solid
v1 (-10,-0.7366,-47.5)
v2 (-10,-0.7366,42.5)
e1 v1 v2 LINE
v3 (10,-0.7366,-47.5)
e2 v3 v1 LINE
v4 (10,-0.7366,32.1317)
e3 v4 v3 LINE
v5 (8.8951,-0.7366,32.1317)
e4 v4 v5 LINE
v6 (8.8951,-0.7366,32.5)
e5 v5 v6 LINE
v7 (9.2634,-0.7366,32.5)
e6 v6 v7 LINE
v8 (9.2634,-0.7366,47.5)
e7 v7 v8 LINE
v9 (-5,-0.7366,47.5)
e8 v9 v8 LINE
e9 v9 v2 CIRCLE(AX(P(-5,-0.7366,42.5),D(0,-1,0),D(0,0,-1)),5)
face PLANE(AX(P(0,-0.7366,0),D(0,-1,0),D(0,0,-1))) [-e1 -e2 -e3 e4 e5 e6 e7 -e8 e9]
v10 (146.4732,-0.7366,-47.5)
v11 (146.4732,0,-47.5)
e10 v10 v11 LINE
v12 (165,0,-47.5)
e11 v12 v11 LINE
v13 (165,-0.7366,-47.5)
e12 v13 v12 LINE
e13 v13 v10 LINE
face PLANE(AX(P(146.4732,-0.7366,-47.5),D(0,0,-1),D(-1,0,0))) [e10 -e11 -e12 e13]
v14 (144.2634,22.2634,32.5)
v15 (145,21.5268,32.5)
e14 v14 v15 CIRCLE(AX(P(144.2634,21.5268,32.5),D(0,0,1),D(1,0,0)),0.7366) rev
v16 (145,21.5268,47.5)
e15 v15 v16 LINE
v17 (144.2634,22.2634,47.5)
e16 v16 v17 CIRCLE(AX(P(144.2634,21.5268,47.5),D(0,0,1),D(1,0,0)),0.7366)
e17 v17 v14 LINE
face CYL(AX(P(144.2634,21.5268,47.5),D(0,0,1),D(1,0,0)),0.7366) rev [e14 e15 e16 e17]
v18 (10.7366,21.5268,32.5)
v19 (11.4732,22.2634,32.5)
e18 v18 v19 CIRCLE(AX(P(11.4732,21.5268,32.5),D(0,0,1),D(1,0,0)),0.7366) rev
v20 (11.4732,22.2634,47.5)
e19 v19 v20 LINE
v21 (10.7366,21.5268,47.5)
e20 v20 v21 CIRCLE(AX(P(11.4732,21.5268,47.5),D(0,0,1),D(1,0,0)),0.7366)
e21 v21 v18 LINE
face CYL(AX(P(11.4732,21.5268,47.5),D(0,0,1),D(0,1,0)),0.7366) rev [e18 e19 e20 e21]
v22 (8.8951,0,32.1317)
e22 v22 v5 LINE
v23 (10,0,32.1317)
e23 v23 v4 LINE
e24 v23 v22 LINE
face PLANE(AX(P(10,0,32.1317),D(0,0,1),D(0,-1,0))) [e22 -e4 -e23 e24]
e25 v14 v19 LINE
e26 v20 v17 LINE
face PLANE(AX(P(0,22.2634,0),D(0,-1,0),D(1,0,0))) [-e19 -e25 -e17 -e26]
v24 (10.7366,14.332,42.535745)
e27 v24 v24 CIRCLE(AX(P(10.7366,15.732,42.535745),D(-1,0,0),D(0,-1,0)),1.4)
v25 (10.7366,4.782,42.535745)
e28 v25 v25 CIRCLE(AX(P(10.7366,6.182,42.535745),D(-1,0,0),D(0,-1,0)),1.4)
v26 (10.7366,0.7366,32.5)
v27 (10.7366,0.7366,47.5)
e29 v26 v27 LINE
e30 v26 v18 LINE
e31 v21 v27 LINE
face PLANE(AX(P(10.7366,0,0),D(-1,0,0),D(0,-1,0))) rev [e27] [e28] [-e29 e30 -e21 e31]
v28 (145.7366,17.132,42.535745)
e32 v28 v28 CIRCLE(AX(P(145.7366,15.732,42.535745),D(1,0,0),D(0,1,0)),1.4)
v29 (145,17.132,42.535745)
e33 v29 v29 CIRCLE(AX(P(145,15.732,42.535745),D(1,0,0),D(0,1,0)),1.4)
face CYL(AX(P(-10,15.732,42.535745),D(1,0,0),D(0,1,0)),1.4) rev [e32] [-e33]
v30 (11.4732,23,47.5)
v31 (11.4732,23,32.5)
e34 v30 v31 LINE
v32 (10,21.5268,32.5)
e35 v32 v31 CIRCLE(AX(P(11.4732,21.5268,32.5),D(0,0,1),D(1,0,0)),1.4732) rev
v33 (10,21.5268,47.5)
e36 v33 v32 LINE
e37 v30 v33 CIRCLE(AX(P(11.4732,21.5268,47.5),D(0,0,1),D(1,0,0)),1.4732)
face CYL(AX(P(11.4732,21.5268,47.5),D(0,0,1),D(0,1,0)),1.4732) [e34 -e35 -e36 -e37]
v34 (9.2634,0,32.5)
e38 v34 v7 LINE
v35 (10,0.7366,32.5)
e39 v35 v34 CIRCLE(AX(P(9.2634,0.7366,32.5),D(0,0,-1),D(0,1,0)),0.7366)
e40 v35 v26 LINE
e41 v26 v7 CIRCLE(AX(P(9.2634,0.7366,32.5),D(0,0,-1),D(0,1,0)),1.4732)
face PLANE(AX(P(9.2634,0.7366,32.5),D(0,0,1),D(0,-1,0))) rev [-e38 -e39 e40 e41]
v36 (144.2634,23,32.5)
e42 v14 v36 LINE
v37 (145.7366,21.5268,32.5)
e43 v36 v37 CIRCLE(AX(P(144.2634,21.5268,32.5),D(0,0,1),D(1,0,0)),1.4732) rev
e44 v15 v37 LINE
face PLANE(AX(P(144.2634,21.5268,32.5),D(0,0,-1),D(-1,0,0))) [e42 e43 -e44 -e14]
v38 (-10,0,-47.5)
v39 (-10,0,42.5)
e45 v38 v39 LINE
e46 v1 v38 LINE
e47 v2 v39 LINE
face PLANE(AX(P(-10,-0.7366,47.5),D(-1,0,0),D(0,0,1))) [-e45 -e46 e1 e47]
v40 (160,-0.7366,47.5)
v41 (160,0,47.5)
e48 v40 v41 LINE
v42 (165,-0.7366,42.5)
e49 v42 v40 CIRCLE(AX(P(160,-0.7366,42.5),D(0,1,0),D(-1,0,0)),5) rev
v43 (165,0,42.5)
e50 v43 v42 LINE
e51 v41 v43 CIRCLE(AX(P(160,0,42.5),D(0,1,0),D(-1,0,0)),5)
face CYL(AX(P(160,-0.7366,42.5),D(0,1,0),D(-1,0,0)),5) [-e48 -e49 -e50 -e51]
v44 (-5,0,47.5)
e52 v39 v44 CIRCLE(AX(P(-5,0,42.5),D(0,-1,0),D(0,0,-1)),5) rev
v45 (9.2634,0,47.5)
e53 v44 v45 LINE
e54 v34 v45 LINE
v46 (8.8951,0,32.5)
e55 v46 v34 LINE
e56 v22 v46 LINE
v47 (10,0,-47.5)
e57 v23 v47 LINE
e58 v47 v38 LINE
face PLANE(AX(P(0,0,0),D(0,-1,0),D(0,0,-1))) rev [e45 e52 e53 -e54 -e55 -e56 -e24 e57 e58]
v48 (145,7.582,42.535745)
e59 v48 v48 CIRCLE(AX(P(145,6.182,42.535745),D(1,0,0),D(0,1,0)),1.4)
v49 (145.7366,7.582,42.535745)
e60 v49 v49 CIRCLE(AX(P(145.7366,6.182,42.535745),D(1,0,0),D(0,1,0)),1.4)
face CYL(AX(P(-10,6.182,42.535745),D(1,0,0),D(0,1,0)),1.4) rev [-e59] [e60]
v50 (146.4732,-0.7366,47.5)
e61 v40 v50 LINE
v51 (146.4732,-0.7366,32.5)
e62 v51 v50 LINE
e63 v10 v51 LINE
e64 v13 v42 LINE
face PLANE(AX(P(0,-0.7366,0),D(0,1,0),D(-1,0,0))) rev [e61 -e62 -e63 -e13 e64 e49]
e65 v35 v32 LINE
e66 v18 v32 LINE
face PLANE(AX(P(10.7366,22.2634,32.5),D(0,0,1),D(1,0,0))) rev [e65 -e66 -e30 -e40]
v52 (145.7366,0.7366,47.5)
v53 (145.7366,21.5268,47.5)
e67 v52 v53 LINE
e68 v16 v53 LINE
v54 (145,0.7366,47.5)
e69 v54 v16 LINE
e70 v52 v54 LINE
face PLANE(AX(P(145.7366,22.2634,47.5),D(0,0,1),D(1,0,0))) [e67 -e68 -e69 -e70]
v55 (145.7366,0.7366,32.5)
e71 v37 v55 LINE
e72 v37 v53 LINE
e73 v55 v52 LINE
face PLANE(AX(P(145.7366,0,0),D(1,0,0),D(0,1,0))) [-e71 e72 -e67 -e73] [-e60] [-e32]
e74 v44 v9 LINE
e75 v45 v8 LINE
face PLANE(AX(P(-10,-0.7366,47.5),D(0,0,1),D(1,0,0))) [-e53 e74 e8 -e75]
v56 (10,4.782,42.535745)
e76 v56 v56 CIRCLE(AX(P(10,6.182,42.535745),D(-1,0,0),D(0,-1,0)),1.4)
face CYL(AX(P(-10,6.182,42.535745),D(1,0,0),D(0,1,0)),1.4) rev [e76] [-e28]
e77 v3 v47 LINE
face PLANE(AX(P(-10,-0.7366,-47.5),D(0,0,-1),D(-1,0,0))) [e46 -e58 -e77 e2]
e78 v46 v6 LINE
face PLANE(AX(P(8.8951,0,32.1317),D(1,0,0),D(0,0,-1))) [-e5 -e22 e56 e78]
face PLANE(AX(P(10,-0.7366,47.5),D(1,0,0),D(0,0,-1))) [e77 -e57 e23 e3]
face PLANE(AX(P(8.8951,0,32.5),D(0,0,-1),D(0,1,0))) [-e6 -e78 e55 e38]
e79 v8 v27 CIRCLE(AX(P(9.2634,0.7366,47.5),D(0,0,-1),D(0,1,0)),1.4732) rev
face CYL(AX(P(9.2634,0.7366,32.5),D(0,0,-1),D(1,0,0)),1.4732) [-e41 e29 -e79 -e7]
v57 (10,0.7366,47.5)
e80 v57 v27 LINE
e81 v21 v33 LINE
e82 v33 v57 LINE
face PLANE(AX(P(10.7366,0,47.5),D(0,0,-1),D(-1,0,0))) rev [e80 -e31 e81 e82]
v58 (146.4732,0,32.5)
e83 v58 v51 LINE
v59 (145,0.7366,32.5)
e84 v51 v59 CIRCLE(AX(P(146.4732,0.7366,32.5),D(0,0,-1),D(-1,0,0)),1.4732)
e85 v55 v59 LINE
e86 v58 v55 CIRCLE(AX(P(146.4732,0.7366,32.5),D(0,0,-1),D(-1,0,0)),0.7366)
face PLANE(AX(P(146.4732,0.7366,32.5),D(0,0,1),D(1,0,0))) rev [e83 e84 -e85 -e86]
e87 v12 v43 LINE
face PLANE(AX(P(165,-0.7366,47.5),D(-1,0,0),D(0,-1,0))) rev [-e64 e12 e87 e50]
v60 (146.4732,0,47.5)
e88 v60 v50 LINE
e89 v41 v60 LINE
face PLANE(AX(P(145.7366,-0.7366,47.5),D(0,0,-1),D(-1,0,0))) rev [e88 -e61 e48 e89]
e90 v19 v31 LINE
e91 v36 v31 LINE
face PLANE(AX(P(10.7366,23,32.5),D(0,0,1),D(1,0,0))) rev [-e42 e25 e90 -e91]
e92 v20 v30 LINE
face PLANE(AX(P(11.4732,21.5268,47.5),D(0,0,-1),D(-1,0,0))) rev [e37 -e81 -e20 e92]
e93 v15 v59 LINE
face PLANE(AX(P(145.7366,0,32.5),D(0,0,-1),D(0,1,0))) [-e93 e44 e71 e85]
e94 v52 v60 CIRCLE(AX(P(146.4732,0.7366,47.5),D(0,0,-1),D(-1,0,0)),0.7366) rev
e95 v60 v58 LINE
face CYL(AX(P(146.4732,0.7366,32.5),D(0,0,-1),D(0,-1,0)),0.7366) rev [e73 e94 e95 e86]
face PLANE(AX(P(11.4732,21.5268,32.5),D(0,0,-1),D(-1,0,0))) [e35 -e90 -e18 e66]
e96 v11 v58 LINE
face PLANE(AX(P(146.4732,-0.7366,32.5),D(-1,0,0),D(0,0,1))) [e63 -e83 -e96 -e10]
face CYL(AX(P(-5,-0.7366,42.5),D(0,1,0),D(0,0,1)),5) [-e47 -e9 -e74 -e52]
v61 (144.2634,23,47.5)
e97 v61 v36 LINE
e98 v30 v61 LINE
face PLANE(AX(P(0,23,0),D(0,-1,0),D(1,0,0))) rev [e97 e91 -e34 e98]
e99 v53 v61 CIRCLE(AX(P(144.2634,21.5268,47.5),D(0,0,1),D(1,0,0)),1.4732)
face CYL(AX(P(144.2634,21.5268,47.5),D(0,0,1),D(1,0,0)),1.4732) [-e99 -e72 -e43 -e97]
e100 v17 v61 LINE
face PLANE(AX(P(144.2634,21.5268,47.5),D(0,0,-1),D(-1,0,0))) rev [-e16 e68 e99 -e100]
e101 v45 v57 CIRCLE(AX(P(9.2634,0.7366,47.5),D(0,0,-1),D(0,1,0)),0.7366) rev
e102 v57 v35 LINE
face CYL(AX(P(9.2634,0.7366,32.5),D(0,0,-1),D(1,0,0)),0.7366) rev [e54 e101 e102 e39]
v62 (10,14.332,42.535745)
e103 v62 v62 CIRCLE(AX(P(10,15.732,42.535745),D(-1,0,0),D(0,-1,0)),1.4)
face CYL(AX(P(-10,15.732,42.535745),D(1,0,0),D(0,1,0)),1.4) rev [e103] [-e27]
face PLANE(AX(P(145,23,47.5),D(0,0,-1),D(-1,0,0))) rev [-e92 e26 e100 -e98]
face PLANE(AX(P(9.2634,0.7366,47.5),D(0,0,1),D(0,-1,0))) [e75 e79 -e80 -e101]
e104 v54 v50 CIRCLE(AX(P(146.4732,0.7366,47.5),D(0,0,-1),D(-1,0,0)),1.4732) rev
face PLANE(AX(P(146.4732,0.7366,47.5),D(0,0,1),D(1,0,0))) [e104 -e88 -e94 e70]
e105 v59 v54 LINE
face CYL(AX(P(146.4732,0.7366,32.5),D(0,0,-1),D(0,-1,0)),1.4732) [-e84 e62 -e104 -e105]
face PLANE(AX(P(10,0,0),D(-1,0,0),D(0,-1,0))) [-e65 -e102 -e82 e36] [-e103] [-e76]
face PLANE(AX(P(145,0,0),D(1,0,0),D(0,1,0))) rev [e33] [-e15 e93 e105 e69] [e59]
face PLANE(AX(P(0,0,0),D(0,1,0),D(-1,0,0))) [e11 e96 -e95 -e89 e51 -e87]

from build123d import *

# Parameters (mm, degrees)
SKETCH1_W                     = 20
SKETCH1_H                     = 95
BASE_FLANGE1_DEPTH            = 0.7366
EDGE_FLANGE1_STRIP_W          = 4.4196
EDGE_FLANGE1_STRIP_H          = 0.7366
EDGE_FLANGE1_STRIP_CUT_DEPTH  = 15
EDGE_FLANGE1_RELIEF_W         = 4.7879
EDGE_FLANGE1_RELIEF_H         = 0.3683
EDGE_FLANGE1_RELIEF_CUT_DEPTH = 0.7366
EDGE_FLANGE1_DEPTH            = 15
EDGE_FLANGE2_STRIP_W          = 4.4196
EDGE_FLANGE2_STRIP_H          = 0.7366
EDGE_FLANGE2_STRIP_CUT_DEPTH  = 15
EDGE_FLANGE2_DEPTH            = 15
EDGE_FLANGE3_STRIP_W          = 4.4196
EDGE_FLANGE3_STRIP_H          = 0.7366
EDGE_FLANGE3_STRIP_CUT_DEPTH  = 15
EDGE_FLANGE3_DEPTH            = 15
EDGE_FLANGE4_STRIP_W          = 4.4196
EDGE_FLANGE4_STRIP_H          = 0.7366
EDGE_FLANGE4_STRIP_CUT_DEPTH  = 15
EDGE_FLANGE4_DEPTH            = 15
SKETCH20_W                    = 18.5268
SKETCH20_H                    = 80
TAB1_DEPTH                    = 0.7366
CUT_EXTRUDE1_DEPTH            = 267.594423465
CUT_EXTRUDE1_DEPTH_BACK       = 267.594423465
SKETCH23_R                    = 1.4
CUT_EXTRUDE2_DEPTH            = 267.594423465
CUT_EXTRUDE2_DEPTH_BACK       = 267.594423465
SKETCH24_R                    = 1.4
FILLET3_R                     = 5
FILLET4_R                     = 5


# Sheet-metal steps are written as plain solids
with BuildPart() as part:
    # Sketch1 → Base-Flange1 (new body)
    with BuildSketch(Plane(origin=(0, 0, 0), x_dir=(1, 0, 0), z_dir=(0, 1, 0))):
        Rectangle(SKETCH1_W, SKETCH1_H)
    extrude(amount=-BASE_FLANGE1_DEPTH)

    # Edge-Flange1 strip (across the edge) → Edge-Flange1 strip cut (cut)
    with BuildSketch(Plane(origin=(10, 0, 47.5), x_dir=(-1, 0, 0), z_dir=(0, 0, -1))):
        with Locations((-1.4732, -0.3683)):
            Rectangle(EDGE_FLANGE1_STRIP_W, EDGE_FLANGE1_STRIP_H)
    extrude(amount=EDGE_FLANGE1_STRIP_CUT_DEPTH, mode=Mode.SUBTRACT)

    # Edge-Flange1 relief (on the sheet) → Edge-Flange1 relief cut (cut)
    with BuildSketch(Plane(origin=(9.2634, 0, 47.5), x_dir=(-1, 0, 0), z_dir=(0, 1, 0))):
        with Locations((-2.02565, -15.18415)):
            Rectangle(EDGE_FLANGE1_RELIEF_W, EDGE_FLANGE1_RELIEF_H)
    extrude(amount=-EDGE_FLANGE1_RELIEF_CUT_DEPTH, mode=Mode.SUBTRACT)

    # Edge-Flange1 section (across the edge) → Edge-Flange1 (add)
    with BuildSketch(Plane(origin=(10, 0, 47.5), x_dir=(-1, 0, 0), z_dir=(0, 0, -1))):
        with BuildLine():
            Line((-0.7366, 0.7366), (-0.7366, 22.2634))
            Line((-0.7366, 22.2634), (0, 22.2634))
            Line((0, 22.2634), (0, 0.7366))
            ThreePointArc((0, 0.7366), (0.215745145, 0.215745145), (0.7366, 0))
            Line((0.7366, 0), (0.7366, -0.7366))
            ThreePointArc((0.7366, -0.7366), (-0.30510971, -0.30510971), (-0.7366, 0.7366))
        make_face()
    extrude(amount=EDGE_FLANGE1_DEPTH)

    # Edge-Flange2 strip (across the edge) → Edge-Flange2 strip cut (cut)
    with BuildSketch(Plane(origin=(10.7366, 22.2634, 32.5), x_dir=(0, -1, 0), z_dir=(0, 0, 1))):
        with Locations((-1.4732, -0.3683)):
            Rectangle(EDGE_FLANGE2_STRIP_W, EDGE_FLANGE2_STRIP_H)
    extrude(amount=EDGE_FLANGE2_STRIP_CUT_DEPTH, mode=Mode.SUBTRACT)

    # Edge-Flange2 section (across the edge) → Edge-Flange2 (add)
    with BuildSketch(Plane(origin=(10.7366, 22.2634, 32.5), x_dir=(0, -1, 0), z_dir=(0, 0, 1))):
        with BuildLine():
            Line((-0.7366, 0.7366), (-0.7366, 134.2634))
            Line((-0.7366, 134.2634), (0, 134.2634))
            Line((0, 134.2634), (0, 0.7366))
            ThreePointArc((0, 0.7366), (0.215745145, 0.215745145), (0.7366, 0))
            Line((0.7366, 0), (0.7366, -0.7366))
            ThreePointArc((0.7366, -0.7366), (-0.30510971, -0.30510971), (-0.7366, 0.7366))
        make_face()
    extrude(amount=EDGE_FLANGE2_DEPTH)

    # Edge-Flange3 strip (across the edge) → Edge-Flange3 strip cut (cut)
    with BuildSketch(Plane(origin=(145, 22.2634, 32.5), x_dir=(-1, 0, 0), z_dir=(0, 0, 1))):
        with Locations((-1.4732, -0.3683)):
            Rectangle(EDGE_FLANGE3_STRIP_W, EDGE_FLANGE3_STRIP_H)
    extrude(amount=EDGE_FLANGE3_STRIP_CUT_DEPTH, mode=Mode.SUBTRACT)

    # Edge-Flange3 section (across the edge) → Edge-Flange3 (add)
    with BuildSketch(Plane(origin=(145, 22.2634, 32.5), x_dir=(-1, 0, 0), z_dir=(0, 0, 1))):
        with BuildLine():
            Line((-0.7366, 0.7366), (-0.7366, 22.2634))
            Line((-0.7366, 22.2634), (0, 22.2634))
            Line((0, 22.2634), (0, 0.7366))
            ThreePointArc((0, 0.7366), (0.215745145, 0.215745145), (0.7366, 0))
            Line((0.7366, 0), (0.7366, -0.7366))
            ThreePointArc((0.7366, -0.7366), (-0.30510971, -0.30510971), (-0.7366, 0.7366))
        make_face()
    extrude(amount=EDGE_FLANGE3_DEPTH)

    # Edge-Flange4 strip (across the edge) → Edge-Flange4 strip cut (cut)
    with BuildSketch(Plane(origin=(145.7366, 0, 47.5), x_dir=(0, 1, 0), z_dir=(0, 0, -1))):
        with Locations((-1.4732, -0.3683)):
            Rectangle(EDGE_FLANGE4_STRIP_W, EDGE_FLANGE4_STRIP_H)
    extrude(amount=EDGE_FLANGE4_STRIP_CUT_DEPTH, mode=Mode.SUBTRACT)

    # Edge-Flange4 section (across the edge) → Edge-Flange4 (add)
    with BuildSketch(Plane(origin=(145.7366, 0, 47.5), x_dir=(0, 1, 0), z_dir=(0, 0, -1))):
        with BuildLine():
            Line((-0.7366, 0.7366), (-0.7366, 19.2634))
            Line((-0.7366, 19.2634), (0, 19.2634))
            Line((0, 19.2634), (0, 0.7366))
            ThreePointArc((0, 0.7366), (0.215745145, 0.215745145), (0.7366, 0))
            Line((0.7366, 0), (0.7366, -0.7366))
            ThreePointArc((0.7366, -0.7366), (-0.30510971, -0.30510971), (-0.7366, 0.7366))
        make_face()
    extrude(amount=EDGE_FLANGE4_DEPTH)

    # Sketch20 → Tab1 (add)
    with BuildSketch(Plane(origin=(0, 0, 0), x_dir=(1, 0, 0), z_dir=(0, 1, 0))):
        with Locations((155.7366, 7.5)):
            Rectangle(SKETCH20_W, SKETCH20_H)
    extrude(amount=-TAB1_DEPTH)

    # Sketch23 → Cut-Extrude1 (cut, two sides: drawn at the far end of the back side and taken through both)
    with BuildSketch(Plane(origin=(10.7366, -49.681752082, -157.421333583), x_dir=(0, 0, -1), z_dir=(1, 0, 0)).offset(-CUT_EXTRUDE1_DEPTH_BACK)):
        with Locations(Location((-199.95707875, 65.413752097, 0), (0, 0, 270))):
            Circle(SKETCH23_R)
    extrude(amount=CUT_EXTRUDE1_DEPTH + CUT_EXTRUDE1_DEPTH_BACK, mode=Mode.SUBTRACT)

    # Sketch24 → Cut-Extrude2 (cut, two sides: drawn at the far end of the back side and taken through both)
    with BuildSketch(Plane(origin=(10.7366, -49.681752082, -157.421333583), x_dir=(0, 0, -1), z_dir=(1, 0, 0)).offset(-CUT_EXTRUDE2_DEPTH_BACK)):
        with Locations(Location((-199.95707875, 55.863752097, 0), (0, 0, 270))):
            Circle(SKETCH24_R)
    extrude(amount=CUT_EXTRUDE2_DEPTH + CUT_EXTRUDE2_DEPTH_BACK, mode=Mode.SUBTRACT)

    # Fillet3
    fillet3_edges = [part.edges().sort_by_distance(p)[0] for p in [
        (-10, -0.3683, 47.5),
    ]]
    fillet(fillet3_edges, radius=FILLET3_R)

    # Fillet4
    fillet4_edges = [part.edges().sort_by_distance(p)[0] for p in [
        (165, -0.3683, 47.5),
    ]]
    fillet(fillet4_edges, radius=FILLET4_R)


solid = part.part
